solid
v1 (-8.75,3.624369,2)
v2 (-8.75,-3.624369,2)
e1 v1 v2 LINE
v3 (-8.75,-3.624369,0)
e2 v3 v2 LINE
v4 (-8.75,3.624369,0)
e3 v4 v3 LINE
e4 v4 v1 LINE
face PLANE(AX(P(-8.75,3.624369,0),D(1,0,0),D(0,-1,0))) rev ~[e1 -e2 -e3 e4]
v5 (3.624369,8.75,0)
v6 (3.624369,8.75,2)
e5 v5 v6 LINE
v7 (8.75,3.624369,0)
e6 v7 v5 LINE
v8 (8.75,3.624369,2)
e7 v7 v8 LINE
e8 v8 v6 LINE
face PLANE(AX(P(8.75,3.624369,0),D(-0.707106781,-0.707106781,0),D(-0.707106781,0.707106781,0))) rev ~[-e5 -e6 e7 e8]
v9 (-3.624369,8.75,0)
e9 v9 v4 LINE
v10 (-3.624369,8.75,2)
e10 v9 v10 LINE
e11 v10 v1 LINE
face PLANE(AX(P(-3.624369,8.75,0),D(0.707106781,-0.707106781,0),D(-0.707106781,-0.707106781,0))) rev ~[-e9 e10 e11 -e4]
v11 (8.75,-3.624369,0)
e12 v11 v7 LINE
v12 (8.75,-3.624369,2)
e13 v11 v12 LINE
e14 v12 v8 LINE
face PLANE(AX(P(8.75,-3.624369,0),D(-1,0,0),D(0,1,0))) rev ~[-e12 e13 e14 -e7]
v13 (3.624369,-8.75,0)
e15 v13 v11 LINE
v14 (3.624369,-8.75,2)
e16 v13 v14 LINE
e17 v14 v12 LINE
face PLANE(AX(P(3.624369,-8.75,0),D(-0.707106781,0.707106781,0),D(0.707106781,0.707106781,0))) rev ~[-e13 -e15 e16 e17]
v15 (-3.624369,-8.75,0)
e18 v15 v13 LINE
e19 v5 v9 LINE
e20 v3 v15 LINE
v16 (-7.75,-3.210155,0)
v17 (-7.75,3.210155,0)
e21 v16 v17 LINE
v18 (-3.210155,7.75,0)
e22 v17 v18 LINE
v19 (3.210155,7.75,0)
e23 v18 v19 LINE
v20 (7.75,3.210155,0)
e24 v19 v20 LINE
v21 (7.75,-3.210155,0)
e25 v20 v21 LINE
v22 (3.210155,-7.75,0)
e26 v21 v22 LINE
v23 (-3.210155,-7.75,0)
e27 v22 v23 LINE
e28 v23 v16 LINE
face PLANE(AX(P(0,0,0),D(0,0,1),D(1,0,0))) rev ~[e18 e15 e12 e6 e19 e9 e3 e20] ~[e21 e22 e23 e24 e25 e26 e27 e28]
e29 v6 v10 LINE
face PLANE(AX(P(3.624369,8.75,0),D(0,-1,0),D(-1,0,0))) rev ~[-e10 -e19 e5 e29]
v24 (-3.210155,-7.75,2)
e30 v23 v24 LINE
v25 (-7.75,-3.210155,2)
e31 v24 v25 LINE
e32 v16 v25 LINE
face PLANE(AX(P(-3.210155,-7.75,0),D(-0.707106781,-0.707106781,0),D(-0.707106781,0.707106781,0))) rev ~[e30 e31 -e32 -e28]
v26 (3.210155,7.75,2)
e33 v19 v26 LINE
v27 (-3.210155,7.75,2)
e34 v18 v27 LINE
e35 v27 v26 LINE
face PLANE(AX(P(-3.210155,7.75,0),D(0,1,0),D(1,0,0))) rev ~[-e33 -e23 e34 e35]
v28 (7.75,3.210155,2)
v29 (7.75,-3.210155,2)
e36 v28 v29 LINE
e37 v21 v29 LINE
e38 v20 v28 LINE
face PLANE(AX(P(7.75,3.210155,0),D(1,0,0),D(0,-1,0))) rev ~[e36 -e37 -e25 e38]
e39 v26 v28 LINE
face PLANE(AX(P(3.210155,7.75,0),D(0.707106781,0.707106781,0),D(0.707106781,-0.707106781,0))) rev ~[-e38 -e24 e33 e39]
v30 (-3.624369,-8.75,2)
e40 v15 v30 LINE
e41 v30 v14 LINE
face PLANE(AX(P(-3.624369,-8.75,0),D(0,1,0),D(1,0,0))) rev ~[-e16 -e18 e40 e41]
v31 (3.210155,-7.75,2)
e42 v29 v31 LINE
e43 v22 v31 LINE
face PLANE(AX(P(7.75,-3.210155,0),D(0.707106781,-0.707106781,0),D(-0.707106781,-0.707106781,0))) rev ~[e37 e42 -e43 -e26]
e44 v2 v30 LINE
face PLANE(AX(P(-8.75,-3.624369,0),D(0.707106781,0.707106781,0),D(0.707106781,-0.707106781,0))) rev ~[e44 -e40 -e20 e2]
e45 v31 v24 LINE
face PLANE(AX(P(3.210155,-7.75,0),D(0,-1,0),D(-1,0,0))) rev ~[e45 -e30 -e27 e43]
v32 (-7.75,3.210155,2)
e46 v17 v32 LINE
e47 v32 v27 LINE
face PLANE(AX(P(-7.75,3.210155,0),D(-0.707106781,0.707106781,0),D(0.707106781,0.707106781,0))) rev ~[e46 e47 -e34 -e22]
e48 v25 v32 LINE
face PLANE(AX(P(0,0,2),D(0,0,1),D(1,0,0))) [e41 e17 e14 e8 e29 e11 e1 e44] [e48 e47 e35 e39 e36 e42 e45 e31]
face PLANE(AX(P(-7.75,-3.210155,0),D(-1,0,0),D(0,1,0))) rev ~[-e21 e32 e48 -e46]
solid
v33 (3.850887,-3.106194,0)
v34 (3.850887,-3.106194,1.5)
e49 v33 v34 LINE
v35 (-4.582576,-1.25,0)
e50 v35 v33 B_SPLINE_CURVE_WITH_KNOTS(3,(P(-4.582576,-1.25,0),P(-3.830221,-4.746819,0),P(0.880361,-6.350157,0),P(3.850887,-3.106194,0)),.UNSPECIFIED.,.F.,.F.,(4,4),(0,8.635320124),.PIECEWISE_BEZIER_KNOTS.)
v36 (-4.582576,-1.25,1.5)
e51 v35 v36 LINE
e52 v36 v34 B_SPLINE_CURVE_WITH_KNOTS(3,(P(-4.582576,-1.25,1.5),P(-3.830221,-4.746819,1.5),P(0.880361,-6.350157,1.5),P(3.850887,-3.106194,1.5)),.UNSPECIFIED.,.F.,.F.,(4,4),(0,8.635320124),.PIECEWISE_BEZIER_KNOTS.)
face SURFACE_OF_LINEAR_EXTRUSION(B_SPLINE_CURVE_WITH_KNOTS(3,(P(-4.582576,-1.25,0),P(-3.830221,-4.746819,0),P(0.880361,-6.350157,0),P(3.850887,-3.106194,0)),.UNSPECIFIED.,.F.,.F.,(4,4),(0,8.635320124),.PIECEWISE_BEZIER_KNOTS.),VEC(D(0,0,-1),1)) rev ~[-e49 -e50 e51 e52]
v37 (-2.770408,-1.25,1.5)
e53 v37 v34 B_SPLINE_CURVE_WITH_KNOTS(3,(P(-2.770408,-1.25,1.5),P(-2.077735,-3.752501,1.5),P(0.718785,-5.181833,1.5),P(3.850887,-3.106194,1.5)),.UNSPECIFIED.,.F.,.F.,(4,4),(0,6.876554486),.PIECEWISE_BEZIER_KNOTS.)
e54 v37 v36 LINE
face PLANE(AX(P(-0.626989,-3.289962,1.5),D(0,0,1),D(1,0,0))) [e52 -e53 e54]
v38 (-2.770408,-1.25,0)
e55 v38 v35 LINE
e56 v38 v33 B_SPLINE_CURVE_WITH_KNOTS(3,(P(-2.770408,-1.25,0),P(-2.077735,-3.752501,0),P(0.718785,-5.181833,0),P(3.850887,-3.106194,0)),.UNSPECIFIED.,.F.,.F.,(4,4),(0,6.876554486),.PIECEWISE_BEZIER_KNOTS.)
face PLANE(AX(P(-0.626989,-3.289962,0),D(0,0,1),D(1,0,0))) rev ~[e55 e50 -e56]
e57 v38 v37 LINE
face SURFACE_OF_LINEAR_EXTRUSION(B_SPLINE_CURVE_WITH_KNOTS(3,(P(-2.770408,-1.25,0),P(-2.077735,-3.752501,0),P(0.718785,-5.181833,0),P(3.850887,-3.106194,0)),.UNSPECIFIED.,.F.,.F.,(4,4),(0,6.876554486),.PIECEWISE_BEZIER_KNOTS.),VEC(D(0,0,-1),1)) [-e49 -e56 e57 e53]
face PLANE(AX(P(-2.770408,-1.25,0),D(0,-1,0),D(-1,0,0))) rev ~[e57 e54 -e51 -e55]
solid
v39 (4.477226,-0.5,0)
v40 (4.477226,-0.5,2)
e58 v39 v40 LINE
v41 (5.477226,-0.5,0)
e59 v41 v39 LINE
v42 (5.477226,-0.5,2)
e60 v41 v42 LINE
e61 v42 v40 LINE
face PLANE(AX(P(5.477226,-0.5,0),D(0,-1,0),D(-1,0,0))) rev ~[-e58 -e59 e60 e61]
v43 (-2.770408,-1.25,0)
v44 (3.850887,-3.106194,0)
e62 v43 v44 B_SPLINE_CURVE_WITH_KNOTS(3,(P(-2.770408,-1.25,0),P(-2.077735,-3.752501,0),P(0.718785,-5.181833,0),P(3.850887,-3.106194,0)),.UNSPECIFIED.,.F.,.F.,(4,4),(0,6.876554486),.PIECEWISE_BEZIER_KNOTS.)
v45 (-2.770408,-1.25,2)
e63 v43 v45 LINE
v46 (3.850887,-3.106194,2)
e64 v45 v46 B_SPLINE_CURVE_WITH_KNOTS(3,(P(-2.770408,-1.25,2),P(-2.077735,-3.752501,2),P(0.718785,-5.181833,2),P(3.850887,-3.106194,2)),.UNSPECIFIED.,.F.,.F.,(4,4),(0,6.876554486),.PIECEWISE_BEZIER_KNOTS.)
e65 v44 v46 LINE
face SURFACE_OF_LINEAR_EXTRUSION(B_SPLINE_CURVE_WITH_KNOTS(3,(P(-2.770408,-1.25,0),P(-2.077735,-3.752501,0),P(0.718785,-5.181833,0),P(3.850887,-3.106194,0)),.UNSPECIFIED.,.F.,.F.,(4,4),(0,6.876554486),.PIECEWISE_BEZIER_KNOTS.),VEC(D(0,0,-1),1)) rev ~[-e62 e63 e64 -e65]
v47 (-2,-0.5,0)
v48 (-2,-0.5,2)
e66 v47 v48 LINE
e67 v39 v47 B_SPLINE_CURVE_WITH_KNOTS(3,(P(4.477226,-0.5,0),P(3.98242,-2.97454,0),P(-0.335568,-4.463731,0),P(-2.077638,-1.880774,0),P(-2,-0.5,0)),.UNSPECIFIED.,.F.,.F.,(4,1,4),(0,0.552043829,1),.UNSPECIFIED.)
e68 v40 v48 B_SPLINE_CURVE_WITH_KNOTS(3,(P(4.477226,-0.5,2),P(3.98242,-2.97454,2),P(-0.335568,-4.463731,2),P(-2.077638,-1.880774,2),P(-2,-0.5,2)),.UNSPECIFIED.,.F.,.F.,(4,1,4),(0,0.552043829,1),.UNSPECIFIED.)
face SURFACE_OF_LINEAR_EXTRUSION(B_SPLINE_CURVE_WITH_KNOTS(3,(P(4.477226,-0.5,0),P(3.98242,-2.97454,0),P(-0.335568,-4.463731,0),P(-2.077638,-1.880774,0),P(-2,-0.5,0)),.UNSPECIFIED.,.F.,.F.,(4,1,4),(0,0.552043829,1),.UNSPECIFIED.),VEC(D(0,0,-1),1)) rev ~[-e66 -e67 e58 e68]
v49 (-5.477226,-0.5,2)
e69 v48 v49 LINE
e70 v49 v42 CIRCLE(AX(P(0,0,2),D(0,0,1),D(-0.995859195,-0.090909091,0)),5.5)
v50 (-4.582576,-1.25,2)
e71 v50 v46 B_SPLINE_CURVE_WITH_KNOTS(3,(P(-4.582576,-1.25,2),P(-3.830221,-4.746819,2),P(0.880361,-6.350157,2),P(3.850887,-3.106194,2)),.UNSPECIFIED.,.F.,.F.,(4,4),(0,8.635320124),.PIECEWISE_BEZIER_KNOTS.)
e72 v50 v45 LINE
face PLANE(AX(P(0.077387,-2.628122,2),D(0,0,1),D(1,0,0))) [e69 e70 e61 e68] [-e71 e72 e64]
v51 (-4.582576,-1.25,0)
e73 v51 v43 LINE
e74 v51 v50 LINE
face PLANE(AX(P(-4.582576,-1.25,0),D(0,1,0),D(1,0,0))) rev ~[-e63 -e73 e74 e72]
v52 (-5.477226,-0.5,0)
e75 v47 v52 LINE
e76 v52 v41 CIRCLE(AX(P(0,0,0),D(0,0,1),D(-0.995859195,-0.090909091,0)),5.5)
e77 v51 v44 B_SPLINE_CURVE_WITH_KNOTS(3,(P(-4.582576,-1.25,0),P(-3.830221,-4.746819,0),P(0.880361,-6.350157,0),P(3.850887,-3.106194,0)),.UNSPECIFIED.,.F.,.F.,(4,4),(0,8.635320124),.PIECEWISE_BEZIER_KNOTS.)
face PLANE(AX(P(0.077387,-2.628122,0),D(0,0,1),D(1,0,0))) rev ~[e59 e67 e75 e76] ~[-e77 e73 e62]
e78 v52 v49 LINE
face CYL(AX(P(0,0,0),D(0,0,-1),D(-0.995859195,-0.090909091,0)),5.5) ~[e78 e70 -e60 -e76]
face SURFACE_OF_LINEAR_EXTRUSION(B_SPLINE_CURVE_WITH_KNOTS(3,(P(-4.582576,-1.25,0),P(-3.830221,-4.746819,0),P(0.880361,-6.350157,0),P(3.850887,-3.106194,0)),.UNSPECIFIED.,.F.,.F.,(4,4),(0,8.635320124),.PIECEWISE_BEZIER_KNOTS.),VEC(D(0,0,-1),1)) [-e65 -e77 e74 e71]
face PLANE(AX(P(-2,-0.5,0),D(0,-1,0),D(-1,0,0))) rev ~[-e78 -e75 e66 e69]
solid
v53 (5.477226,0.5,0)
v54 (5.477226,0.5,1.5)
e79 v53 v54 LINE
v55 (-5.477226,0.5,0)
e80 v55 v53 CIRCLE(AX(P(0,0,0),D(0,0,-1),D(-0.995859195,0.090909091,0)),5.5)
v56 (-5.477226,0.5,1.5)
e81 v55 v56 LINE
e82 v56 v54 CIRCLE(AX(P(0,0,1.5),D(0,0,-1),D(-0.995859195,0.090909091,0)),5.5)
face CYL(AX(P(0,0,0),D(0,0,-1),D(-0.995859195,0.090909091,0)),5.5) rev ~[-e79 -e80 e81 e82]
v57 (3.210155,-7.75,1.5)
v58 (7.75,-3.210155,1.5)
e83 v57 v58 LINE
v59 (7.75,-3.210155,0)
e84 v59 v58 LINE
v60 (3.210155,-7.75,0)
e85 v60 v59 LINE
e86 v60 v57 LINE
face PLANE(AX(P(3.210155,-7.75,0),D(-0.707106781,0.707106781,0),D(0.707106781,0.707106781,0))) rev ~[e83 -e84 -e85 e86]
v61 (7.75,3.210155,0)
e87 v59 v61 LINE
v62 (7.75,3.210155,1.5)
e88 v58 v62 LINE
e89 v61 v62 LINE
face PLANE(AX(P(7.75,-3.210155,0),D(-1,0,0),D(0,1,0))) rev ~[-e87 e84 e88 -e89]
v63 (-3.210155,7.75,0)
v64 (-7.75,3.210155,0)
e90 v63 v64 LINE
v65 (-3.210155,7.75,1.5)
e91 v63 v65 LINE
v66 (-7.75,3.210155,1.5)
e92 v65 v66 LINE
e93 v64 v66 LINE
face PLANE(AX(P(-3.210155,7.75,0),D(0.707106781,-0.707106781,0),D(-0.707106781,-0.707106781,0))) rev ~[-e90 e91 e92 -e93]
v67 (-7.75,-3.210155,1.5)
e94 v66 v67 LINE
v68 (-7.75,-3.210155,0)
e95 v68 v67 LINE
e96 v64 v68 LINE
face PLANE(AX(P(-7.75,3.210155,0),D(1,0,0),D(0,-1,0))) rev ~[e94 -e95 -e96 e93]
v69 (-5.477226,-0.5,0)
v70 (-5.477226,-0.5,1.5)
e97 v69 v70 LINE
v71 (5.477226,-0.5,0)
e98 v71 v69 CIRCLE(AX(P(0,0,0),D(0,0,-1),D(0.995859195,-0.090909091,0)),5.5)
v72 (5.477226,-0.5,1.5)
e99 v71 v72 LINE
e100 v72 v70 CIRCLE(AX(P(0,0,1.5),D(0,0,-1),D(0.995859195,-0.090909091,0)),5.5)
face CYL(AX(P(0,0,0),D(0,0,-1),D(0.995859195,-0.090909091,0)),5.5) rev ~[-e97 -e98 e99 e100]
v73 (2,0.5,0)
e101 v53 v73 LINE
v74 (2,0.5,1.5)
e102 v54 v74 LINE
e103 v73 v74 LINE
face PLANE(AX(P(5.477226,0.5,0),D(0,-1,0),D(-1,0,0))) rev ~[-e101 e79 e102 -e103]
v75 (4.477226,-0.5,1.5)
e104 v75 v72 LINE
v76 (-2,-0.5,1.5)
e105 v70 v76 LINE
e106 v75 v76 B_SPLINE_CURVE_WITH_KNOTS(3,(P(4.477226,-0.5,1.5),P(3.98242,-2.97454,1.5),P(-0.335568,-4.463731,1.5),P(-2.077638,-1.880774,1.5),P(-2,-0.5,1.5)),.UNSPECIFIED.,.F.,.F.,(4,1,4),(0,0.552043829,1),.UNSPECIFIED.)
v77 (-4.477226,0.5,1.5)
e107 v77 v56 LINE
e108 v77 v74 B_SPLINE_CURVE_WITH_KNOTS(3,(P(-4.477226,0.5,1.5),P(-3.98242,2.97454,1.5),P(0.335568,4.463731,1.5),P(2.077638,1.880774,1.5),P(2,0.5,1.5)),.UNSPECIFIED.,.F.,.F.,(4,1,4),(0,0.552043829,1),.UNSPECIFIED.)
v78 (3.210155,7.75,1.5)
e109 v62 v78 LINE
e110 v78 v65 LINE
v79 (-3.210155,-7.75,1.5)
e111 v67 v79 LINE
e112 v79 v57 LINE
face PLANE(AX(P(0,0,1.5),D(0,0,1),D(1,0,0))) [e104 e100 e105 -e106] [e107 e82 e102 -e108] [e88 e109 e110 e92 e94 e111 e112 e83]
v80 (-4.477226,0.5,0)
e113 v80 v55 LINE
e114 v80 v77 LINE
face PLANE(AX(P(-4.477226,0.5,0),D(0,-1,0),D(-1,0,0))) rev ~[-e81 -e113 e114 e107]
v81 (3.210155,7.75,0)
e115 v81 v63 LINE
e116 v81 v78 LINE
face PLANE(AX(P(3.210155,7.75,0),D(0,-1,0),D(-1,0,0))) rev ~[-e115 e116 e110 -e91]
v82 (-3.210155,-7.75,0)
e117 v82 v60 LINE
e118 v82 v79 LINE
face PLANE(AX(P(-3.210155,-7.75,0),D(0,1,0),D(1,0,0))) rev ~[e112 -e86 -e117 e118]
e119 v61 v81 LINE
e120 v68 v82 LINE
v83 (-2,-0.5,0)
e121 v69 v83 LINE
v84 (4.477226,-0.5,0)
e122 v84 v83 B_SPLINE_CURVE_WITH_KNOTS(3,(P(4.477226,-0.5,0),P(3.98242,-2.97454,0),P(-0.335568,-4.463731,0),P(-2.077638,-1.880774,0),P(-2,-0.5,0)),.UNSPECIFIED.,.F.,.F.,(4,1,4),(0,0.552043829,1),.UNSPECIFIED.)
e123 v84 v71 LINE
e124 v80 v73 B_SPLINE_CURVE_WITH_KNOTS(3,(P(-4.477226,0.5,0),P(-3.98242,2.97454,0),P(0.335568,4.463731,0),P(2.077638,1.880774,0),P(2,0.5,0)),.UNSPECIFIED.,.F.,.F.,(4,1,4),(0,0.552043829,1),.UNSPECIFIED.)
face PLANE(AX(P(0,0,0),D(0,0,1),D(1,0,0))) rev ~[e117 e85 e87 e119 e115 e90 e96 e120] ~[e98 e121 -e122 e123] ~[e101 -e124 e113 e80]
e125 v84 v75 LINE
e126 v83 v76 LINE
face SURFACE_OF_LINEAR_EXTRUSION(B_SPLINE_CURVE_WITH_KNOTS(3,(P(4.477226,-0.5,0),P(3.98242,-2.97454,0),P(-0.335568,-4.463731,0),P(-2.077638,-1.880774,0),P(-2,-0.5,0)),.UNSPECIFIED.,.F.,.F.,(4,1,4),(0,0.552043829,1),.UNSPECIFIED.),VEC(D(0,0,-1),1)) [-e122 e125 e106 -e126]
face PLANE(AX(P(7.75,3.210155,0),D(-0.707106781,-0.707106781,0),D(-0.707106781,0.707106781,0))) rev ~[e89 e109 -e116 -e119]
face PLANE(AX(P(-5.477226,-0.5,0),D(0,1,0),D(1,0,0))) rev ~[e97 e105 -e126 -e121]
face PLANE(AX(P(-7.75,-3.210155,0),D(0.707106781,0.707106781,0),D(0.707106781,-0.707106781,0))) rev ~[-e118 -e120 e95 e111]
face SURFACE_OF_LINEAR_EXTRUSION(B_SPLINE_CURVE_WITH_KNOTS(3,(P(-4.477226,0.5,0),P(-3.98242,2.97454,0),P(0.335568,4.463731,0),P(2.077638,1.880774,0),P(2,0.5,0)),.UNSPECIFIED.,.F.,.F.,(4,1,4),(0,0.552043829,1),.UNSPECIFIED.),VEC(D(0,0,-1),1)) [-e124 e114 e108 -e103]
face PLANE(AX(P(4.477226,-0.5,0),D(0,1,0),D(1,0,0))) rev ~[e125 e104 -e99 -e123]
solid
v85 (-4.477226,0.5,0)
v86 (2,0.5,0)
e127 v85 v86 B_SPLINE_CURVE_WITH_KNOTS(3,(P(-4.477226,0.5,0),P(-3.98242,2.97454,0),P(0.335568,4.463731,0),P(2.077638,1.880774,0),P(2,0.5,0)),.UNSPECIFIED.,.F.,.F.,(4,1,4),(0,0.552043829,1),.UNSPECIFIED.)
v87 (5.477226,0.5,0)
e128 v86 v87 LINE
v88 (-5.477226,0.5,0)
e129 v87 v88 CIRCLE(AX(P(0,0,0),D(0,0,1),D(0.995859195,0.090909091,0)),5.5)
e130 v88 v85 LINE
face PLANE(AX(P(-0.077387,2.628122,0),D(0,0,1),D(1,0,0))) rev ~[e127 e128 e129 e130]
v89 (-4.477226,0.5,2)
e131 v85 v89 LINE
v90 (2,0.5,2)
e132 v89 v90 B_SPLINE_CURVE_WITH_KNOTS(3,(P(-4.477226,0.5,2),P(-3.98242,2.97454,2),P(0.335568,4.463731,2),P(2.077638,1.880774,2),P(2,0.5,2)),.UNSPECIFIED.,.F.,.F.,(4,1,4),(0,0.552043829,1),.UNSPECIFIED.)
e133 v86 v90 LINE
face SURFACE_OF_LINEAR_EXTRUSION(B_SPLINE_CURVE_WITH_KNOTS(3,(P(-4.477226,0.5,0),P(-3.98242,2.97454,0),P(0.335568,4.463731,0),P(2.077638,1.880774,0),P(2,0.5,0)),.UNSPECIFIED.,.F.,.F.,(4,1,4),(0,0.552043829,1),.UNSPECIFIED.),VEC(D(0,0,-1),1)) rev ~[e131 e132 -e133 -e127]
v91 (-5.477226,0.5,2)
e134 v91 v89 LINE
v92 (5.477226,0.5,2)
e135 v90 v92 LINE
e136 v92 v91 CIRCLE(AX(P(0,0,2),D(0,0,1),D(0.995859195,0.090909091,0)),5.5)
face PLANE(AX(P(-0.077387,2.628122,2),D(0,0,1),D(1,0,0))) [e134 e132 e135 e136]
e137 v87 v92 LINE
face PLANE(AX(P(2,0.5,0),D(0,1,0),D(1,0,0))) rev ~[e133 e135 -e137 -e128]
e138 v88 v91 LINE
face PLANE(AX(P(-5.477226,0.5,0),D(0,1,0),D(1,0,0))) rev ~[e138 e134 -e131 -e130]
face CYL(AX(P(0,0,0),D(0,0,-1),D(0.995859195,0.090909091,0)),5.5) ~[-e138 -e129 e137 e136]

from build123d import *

# Parameters (mm, degrees)
F1_DEPTH = 2
F2_DEPTH = 1.5


# Not quite as in the source:
# - a feature names something its author has since deleted; it is built from what else it names


with BuildPart() as f1:
    # F0 (on Top) → F1 (new body)
    with BuildSketch(Plane.XY):
        with BuildLine():
            ThreePointArc((5.4772255751, 0.5), (0, 5.5), (-5.4772255751, 0.5))
            Line((-5.4772255751, 0.5), (-4.4772255751, 0.5))
            add(Edge.make_bspline(
                [(-4.4772255751, 0.5), (-3.9824196137, 2.9745399952), (0.3355675447, 4.4637305093), (2.0776381716, 1.8807736924), (2, 0.5)],
                knots=[0, 0, 0, 0, 0.5520438293, 1, 1, 1, 1], degree=3))
            Line((2, 0.5), (5.4772255751, 0.5))
        make_face()
    extrude(amount=F1_DEPTH)


with BuildPart() as f1b:
    # F0 (on Top) → F1, piece 2 (new body)
    with BuildSketch(Plane.XY):
        with BuildLine():
            Line((-2, -0.5), (-5.4772255751, -0.5))
            ThreePointArc((-5.4772255751, -0.5), (0, -5.5), (5.4772255751, -0.5))
            Line((5.4772255751, -0.5), (4.4772255751, -0.5))
            add(Edge.make_bspline(
                [(4.4772255751, -0.5), (3.9824196137, -2.9745399952), (-0.3355675447, -4.4637305093), (-2.0776381716, -1.8807736924), (-2, -0.5)],
                knots=[0, 0, 0, 0, 0.5520438293, 1, 1, 1, 1], degree=3))
        make_face()
        with BuildLine():
            add(Edge.make_bspline(
                [(-4.582575695, -1.25), (-3.830221016, -4.746818915), (0.8803614764, -6.3501568511), (3.8508872967, -3.1061938498)],
                knots=[0, 0, 0, 0, 8.6353201238, 8.6353201238, 8.6353201238, 8.6353201238], degree=3))
            Line((-4.582575695, -1.25), (-2.770407591, -1.25))
            add(Edge.make_bspline(
                [(-2.770407591, -1.25), (-2.077735262, -3.7525005173), (0.7187846932, -5.1818331704), (3.8508872967, -3.1061938498)],
                knots=[0, 0, 0, 0, 6.876554486, 6.876554486, 6.876554486, 6.876554486], degree=3))
        make_face(mode=Mode.SUBTRACT)
    extrude(amount=F1_DEPTH)


with BuildPart() as f1c:
    # F0 (on Top) → F1, piece 3 (new body)
    with BuildSketch(Plane.XY):
        Polygon((3.6243686708, -8.75), (8.75, -3.6243686708), (8.75, 3.6243686708), (3.6243686708, 8.75), (-3.6243686708, 8.75), (-8.75, 3.6243686708), (-8.75, -3.6243686708), (-3.6243686708, -8.75), align=None)
        Polygon((7.75, 3.2101551084), (7.75, -3.2101551084), (3.2101551084, -7.75), (-3.2101551084, -7.75), (-7.75, -3.2101551084), (-7.75, 3.2101551084), (-3.2101551084, 7.75), (3.2101551084, 7.75), align=None, mode=Mode.SUBTRACT)
    extrude(amount=F1_DEPTH)


with BuildPart() as f2:
    # F0 (on Top) → F2 (new body)
    with BuildSketch(Plane.XY):
        with BuildLine():
            Line((-2.770407591, -1.25), (-4.582575695, -1.25))
            add(Edge.make_bspline(
                [(-4.582575695, -1.25), (-3.830221016, -4.746818915), (0.8803614764, -6.3501568511), (3.8508872967, -3.1061938498)],
                knots=[0, 0, 0, 0, 8.6353201238, 8.6353201238, 8.6353201238, 8.6353201238], degree=3))
            add(Edge.make_bspline(
                [(-2.770407591, -1.25), (-2.077735262, -3.7525005173), (0.7187846932, -5.1818331704), (3.8508872967, -3.1061938498)],
                knots=[0, 0, 0, 0, 6.876554486, 6.876554486, 6.876554486, 6.876554486], degree=3))
        make_face()
    extrude(amount=F2_DEPTH)


with BuildPart() as f2b:
    # F0 (on Top) → F2, piece 2 (new body)
    with BuildSketch(Plane.XY):
        Polygon((3.2101551084, -7.75), (7.75, -3.2101551084), (7.75, 3.2101551084), (3.2101551084, 7.75), (-3.2101551084, 7.75), (-7.75, 3.2101551084), (-7.75, -3.2101551084), (-3.2101551084, -7.75), align=None)
        with BuildLine():
            ThreePointArc((5.4772255751, -0.5), (0, -5.5), (-5.4772255751, -0.5))
            Line((-5.4772255751, -0.5), (-2, -0.5))
            add(Edge.make_bspline(
                [(4.4772255751, -0.5), (3.9824196137, -2.9745399952), (-0.3355675447, -4.4637305093), (-2.0776381716, -1.8807736924), (-2, -0.5)],
                knots=[0, 0, 0, 0, 0.5520438293, 1, 1, 1, 1], degree=3))
            Line((4.4772255751, -0.5), (5.4772255751, -0.5))
        make_face(mode=Mode.SUBTRACT)
        with BuildLine():
            Line((-4.4772255751, 0.5), (-5.4772255751, 0.5))
            ThreePointArc((-5.4772255751, 0.5), (0, 5.5), (5.4772255751, 0.5))
            Line((5.4772255751, 0.5), (2, 0.5))
            add(Edge.make_bspline(
                [(-4.4772255751, 0.5), (-3.9824196137, 2.9745399952), (0.3355675447, 4.4637305093), (2.0776381716, 1.8807736924), (2, 0.5)],
                knots=[0, 0, 0, 0, 0.5520438293, 1, 1, 1, 1], degree=3))
        make_face(mode=Mode.SUBTRACT)
    extrude(amount=F2_DEPTH)


solid = Compound([f1.part, f1b.part, f1c.part, f2.part, f2b.part])
